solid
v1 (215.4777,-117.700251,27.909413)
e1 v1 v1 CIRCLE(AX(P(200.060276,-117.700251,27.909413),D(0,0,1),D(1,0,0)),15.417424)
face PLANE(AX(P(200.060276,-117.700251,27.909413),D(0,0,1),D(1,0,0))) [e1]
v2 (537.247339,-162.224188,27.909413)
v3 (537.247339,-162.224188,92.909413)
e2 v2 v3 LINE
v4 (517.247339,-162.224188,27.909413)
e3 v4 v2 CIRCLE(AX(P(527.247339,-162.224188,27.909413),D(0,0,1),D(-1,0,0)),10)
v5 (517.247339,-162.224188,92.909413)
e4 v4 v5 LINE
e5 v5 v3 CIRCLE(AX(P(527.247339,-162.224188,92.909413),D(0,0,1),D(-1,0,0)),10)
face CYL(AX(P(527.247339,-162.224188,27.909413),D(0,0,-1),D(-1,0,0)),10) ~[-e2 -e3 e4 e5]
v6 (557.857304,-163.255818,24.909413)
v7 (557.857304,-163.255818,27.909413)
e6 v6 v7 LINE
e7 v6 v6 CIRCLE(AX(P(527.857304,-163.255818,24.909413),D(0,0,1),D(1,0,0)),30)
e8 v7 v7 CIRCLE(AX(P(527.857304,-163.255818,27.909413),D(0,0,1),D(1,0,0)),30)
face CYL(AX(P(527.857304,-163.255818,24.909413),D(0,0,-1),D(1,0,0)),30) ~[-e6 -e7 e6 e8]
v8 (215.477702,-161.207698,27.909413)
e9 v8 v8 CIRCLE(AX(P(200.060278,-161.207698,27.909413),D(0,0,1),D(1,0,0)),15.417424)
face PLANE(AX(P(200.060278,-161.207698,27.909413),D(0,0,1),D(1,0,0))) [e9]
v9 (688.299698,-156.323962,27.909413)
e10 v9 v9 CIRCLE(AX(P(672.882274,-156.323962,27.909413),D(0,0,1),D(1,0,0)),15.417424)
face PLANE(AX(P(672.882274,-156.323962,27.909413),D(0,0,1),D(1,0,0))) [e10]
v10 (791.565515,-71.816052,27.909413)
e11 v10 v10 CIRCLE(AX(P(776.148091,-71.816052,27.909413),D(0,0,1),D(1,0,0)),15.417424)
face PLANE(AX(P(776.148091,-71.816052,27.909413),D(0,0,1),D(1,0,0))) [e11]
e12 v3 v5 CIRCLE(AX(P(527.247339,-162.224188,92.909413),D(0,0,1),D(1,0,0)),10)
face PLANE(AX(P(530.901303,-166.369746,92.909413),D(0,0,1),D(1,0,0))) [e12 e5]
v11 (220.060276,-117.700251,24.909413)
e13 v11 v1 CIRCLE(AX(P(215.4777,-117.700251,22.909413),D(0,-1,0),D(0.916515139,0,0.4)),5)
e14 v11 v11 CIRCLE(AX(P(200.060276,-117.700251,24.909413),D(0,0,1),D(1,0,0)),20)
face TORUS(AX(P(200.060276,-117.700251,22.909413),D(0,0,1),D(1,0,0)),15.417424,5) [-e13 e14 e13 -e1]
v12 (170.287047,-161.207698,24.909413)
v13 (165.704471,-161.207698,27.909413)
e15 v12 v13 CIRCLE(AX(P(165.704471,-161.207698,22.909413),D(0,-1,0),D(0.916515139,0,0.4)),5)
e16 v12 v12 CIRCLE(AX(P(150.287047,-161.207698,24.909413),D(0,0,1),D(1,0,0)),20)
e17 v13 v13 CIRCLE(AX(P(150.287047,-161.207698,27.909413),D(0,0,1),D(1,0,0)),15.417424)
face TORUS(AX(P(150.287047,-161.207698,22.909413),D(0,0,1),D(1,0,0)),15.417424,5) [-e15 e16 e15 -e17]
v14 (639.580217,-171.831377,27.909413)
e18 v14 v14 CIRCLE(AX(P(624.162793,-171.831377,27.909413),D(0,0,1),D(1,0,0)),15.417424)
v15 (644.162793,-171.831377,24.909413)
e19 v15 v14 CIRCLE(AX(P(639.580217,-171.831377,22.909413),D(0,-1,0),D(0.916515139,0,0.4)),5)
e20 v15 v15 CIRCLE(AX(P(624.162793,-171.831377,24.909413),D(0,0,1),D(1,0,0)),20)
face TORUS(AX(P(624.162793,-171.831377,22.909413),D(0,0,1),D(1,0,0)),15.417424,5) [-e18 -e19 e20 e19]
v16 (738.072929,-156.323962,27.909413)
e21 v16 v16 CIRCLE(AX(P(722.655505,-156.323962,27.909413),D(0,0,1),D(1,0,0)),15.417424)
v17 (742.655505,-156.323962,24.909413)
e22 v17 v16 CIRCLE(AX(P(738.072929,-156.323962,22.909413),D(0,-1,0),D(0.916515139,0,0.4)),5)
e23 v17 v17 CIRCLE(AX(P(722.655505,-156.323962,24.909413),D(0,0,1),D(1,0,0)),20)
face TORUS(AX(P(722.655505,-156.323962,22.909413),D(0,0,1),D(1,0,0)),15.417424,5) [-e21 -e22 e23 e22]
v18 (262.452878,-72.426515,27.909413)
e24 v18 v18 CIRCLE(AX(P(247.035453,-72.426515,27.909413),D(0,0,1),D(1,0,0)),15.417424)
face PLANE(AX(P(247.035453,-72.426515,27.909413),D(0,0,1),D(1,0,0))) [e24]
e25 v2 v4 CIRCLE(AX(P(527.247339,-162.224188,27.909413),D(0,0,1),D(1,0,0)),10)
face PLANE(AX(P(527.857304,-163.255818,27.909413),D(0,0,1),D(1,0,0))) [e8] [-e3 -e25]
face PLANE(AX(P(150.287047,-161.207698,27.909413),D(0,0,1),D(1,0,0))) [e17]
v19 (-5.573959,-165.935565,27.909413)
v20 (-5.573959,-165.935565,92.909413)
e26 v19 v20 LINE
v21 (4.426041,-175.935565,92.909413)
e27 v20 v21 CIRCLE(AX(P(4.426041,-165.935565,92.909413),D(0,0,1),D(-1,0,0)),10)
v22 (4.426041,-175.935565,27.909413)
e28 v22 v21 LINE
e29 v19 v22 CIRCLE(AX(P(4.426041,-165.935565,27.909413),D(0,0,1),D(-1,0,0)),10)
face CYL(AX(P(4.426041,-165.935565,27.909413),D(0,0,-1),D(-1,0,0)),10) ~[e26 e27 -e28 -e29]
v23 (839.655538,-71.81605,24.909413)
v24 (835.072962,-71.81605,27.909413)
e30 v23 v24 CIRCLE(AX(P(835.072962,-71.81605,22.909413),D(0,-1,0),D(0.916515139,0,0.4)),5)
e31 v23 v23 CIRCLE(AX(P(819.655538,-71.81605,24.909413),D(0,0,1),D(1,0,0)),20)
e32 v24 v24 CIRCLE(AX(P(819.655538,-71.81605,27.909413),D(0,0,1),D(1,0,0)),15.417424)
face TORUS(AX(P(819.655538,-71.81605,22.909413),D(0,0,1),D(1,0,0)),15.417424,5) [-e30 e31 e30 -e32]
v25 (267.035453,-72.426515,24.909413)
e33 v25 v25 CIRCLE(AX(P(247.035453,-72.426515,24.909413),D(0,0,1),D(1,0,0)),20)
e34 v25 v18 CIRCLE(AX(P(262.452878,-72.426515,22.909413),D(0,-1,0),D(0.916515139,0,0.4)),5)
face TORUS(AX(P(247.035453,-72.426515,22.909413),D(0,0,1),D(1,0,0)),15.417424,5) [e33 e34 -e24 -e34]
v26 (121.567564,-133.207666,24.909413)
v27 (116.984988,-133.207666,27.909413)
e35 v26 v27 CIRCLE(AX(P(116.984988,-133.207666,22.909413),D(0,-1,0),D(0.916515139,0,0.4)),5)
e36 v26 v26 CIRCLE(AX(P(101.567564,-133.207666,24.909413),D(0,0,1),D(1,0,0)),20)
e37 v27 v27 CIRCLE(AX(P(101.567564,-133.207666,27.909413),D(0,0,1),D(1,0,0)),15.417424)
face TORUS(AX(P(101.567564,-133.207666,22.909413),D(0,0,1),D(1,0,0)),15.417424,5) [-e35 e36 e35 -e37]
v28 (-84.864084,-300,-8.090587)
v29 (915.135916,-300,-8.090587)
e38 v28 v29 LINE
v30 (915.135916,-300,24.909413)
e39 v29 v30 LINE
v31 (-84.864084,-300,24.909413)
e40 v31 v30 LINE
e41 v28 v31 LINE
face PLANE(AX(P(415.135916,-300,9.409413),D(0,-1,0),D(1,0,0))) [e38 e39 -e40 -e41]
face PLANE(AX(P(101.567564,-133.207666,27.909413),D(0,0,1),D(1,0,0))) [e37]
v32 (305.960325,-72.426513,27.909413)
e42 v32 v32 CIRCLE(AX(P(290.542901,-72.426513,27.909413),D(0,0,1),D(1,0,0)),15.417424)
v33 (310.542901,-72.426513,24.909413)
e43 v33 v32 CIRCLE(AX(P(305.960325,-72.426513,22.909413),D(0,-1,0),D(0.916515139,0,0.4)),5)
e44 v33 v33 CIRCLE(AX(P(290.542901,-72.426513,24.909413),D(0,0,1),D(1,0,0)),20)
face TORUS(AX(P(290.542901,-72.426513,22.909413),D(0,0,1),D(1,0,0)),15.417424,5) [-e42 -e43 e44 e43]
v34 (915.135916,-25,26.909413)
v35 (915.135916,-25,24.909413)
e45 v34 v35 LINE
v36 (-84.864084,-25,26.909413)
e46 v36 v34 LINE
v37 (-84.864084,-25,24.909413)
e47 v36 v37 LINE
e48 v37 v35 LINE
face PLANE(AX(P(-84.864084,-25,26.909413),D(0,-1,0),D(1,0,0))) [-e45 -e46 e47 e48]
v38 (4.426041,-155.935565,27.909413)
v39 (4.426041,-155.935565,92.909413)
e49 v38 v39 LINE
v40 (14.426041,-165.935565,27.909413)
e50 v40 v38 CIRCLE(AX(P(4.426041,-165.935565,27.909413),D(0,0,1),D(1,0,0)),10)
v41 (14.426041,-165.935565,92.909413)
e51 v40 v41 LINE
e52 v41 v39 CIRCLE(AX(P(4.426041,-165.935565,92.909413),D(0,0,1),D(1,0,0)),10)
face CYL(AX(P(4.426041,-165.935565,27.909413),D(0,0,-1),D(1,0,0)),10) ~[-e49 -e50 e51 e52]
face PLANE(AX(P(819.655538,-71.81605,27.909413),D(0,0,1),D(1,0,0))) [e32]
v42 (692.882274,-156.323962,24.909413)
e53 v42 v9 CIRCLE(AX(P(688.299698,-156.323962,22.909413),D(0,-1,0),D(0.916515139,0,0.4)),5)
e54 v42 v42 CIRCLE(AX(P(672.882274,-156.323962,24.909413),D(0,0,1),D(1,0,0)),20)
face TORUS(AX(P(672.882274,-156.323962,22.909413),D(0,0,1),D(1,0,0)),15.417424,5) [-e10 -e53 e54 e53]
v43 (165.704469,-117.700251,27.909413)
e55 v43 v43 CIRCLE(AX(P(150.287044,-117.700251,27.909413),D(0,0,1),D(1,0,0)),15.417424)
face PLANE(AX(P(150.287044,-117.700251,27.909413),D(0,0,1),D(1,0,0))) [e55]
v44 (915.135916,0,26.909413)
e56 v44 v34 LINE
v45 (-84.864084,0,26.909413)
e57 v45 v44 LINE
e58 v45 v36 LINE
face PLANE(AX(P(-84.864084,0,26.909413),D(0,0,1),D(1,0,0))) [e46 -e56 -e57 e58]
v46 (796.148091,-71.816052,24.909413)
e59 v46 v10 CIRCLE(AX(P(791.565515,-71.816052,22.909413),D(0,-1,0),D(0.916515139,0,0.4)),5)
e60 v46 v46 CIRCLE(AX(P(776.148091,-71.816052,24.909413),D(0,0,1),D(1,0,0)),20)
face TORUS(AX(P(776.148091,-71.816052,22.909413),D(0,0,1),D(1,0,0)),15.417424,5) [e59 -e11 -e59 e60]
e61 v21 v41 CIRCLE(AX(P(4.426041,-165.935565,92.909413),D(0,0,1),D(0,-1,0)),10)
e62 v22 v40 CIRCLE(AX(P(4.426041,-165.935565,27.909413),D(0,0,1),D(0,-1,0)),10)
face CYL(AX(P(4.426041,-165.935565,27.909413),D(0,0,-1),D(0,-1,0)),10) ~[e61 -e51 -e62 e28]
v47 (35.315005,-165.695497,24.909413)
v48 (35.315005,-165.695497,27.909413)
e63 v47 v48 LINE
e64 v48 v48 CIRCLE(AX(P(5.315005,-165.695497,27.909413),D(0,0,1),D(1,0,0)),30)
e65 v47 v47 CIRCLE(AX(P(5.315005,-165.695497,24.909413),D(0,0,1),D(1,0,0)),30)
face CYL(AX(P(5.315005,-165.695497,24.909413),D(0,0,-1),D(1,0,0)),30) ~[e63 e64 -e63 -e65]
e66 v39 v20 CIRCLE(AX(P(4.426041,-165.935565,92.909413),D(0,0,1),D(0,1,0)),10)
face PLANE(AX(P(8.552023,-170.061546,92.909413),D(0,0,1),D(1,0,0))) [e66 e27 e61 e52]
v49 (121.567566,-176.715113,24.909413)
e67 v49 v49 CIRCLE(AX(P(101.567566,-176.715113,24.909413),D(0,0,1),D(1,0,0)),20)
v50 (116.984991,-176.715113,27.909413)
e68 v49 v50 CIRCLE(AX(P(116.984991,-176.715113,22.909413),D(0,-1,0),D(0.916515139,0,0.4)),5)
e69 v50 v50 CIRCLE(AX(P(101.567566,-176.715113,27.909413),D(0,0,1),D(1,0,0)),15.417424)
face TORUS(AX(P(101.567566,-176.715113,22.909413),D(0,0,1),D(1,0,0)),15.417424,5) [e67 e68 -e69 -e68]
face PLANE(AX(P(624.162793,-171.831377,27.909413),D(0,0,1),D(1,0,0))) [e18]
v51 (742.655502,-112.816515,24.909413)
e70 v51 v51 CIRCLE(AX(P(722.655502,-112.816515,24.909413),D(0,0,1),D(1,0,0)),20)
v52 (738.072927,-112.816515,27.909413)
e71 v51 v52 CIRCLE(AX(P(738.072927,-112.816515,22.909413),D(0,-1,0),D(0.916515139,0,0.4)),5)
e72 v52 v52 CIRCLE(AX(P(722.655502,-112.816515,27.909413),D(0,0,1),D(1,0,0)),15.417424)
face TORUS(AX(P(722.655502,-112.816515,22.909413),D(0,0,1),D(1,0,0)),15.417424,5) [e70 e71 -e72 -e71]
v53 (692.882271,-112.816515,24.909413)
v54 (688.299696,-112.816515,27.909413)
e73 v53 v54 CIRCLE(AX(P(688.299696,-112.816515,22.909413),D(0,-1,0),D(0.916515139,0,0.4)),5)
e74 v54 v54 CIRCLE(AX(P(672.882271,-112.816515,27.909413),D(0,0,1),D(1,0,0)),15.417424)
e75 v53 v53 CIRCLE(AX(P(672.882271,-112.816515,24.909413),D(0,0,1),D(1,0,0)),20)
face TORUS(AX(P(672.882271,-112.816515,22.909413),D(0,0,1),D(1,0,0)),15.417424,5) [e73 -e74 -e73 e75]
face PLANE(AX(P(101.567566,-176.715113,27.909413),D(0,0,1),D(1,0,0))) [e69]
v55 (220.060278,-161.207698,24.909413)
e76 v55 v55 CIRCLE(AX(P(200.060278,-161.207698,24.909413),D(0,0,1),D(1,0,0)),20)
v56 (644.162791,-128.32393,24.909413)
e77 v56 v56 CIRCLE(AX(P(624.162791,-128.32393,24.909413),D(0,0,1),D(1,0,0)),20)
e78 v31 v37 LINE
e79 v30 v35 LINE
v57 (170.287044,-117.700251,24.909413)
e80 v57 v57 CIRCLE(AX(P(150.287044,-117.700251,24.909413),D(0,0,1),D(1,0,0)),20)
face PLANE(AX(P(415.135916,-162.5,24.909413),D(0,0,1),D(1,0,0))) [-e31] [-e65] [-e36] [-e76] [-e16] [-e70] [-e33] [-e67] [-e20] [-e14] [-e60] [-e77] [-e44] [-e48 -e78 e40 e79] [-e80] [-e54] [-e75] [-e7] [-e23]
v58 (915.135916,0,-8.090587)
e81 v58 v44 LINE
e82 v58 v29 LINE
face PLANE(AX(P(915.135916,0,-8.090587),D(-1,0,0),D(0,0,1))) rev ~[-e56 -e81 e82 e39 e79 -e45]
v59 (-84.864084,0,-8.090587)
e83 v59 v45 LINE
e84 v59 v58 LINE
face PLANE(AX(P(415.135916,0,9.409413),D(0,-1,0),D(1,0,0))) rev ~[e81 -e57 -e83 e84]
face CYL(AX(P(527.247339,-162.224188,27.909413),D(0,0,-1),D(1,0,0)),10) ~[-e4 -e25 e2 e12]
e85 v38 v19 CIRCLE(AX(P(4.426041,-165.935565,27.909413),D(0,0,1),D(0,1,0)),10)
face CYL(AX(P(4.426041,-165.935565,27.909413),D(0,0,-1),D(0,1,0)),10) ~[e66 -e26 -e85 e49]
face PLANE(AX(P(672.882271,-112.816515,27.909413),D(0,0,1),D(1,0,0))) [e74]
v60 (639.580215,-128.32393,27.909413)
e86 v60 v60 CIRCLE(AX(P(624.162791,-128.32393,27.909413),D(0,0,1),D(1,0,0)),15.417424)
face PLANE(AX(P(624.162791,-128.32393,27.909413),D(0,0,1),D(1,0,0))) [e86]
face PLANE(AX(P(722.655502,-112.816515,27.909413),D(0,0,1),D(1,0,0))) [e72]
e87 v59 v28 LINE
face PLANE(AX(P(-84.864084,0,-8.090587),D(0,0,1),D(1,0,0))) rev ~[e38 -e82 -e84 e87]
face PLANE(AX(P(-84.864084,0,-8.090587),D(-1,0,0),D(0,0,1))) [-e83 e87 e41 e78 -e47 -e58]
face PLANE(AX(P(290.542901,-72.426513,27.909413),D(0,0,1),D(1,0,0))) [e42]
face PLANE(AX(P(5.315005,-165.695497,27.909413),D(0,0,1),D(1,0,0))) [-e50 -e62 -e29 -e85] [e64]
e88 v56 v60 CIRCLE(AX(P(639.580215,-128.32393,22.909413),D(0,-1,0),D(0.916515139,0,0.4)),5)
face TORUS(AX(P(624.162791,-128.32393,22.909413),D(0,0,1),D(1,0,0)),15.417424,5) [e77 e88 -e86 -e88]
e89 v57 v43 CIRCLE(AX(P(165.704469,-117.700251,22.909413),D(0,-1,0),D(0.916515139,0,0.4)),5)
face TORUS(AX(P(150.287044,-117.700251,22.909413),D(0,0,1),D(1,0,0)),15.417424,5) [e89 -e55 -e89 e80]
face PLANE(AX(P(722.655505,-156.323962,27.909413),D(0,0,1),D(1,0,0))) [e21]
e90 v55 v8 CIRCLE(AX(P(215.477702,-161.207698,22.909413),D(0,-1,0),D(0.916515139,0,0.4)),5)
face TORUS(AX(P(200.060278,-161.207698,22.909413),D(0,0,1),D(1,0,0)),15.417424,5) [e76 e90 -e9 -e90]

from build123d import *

# Parameters (mm, degrees)
F0_W     = 1000
F0_H     = 35
F1_DEPTH = 300
F2_W     = 1000
F2_H     = 275
F3_DEPTH = 2
F4_R     = 30
F4_R_2   = 20
F5_DEPTH = 3
F8_DEPTH = 65


# Not quite as in the source:
# - a fillet or chamfer that OpenCascade refuses, or shapes differently, is made with other operations: its cross-section is extruded or revolved along the edge and cut away or added


with BuildPart() as f1:
    # F0 (on Front) → F1 (new body)
    with BuildSketch(Plane.XZ):
        with Locations((415.1359161552, 9.4094127417)):
            Rectangle(F0_W, F0_H)
    extrude(amount=F1_DEPTH)

    # F2 (on face) → F3 (cut)
    with BuildSketch(Plane.XY.offset(26.9094127417)):
        with Locations((415.1359161552, -162.5)):
            Rectangle(F2_W, F2_H)
    extrude(amount=-F3_DEPTH, mode=Mode.SUBTRACT)

    # F4 (on face) → F5 (join)
    with BuildSketch(Plane.XY.offset(24.9094127417)):
        with Locations((5.3150048805, -165.6954972839)):
            Circle(F4_R)
        with Locations((101.5675663948, -176.7151132226)):
            Circle(F4_R_2)
        with Locations((101.5675638381, -133.2076661438)):
            Circle(F4_R_2)
        with Locations((150.2870444718, -117.7002512067)):
            Circle(F4_R_2)
        with Locations((200.0602781773, -161.2076982856)):
            Circle(F4_R_2)
        with Locations((200.0602756206, -117.7002512067)):
            Circle(F4_R_2)
        with Locations((150.2870470285, -161.2076982856)):
            Circle(F4_R_2)
        with Locations((247.0354534834, -72.4265153941)):
            Circle(F4_R_2)
        with Locations((290.5429005623, -72.4265128374)):
            Circle(F4_R_2)
        with Locations((527.8573036194, -163.2558181882)):
            Circle(F4_R)
        with Locations((624.1627931595, -171.8313768506)):
            Circle(F4_R_2)
        with Locations((624.1627906028, -128.3239297718)):
            Circle(F4_R_2)
        with Locations((672.8822712365, -112.8165148347)):
            Circle(F4_R_2)
        with Locations((672.8822737932, -156.3239619136)):
            Circle(F4_R_2)
        with Locations((722.6555049419, -156.3239619136)):
            Circle(F4_R_2)
        with Locations((722.6555023852, -112.8165148347)):
            Circle(F4_R_2)
        with Locations((776.1480905264, -71.8160520729)):
            Circle(F4_R_2)
        with Locations((819.6555376053, -71.8160495162)):
            Circle(F4_R_2)
    extrude(amount=F5_DEPTH)

    # F6: fillet of radius 5 on 16 edges, made by hand

    # F6_s1 → F6_t2 (revolve, cut)
    with BuildSketch(Plane.XZ.offset(176.7151132226)):
        with BuildLine():
            ThreePointArc((121.5675663948, 24.9094127417), (119.7236034874, 27.0927128743), (116.9849906999, 27.9094127417))
            Line((116.9849906999, 27.9094127417), (121.5675663948, 27.9094127417))
            Line((121.5675663948, 27.9094127417), (121.5675663948, 24.9094127417))
        make_face()
    revolve(axis=Axis((101.5675663948, -176.7151132226, 27.9094127417), (0, 0, 1)), mode=Mode.SUBTRACT)

    # F6_s3 → F6_t4 (revolve, cut)
    with BuildSketch(Plane.XZ.offset(133.2076661438)):
        with BuildLine():
            ThreePointArc((121.5675638381, 24.9094127417), (119.7236009307, 27.0927128743), (116.9849881431, 27.9094127417))
            Line((116.9849881431, 27.9094127417), (121.5675638381, 27.9094127417))
            Line((121.5675638381, 27.9094127417), (121.5675638381, 24.9094127417))
        make_face()
    revolve(axis=Axis((101.5675638381, -133.2076661438, 27.9094127417), (0, 0, 1)), mode=Mode.SUBTRACT)

    # F6_s5 → F6_t6 (revolve, cut)
    with BuildSketch(Plane.XZ.offset(117.7002512067)):
        with BuildLine():
            ThreePointArc((170.2870444718, 24.9094127417), (168.4430815644, 27.0927128743), (165.7044687769, 27.9094127417))
            Line((165.7044687769, 27.9094127417), (170.2870444718, 27.9094127417))
            Line((170.2870444718, 27.9094127417), (170.2870444718, 24.9094127417))
        make_face()
    revolve(axis=Axis((150.2870444718, -117.7002512067, 27.9094127417), (0, 0, 1)), mode=Mode.SUBTRACT)

    # F6_s7 → F6_t8 (revolve, cut)
    with BuildSketch(Plane.XZ.offset(161.2076982856)):
        with BuildLine():
            ThreePointArc((170.2870470285, 24.9094127417), (168.4430841211, 27.0927128743), (165.7044713336, 27.9094127417))
            Line((165.7044713336, 27.9094127417), (170.2870470285, 27.9094127417))
            Line((170.2870470285, 27.9094127417), (170.2870470285, 24.9094127417))
        make_face()
    revolve(axis=Axis((150.2870470285, -161.2076982856, 27.9094127417), (0, 0, 1)), mode=Mode.SUBTRACT)

    # F6_s9 → F6_t10 (revolve, cut)
    with BuildSketch(Plane.XZ.offset(161.2076982856)):
        with BuildLine():
            ThreePointArc((220.0602781773, 24.9094127417), (218.2163152698, 27.0927128743), (215.4777024823, 27.9094127417))
            Line((215.4777024823, 27.9094127417), (220.0602781773, 27.9094127417))
            Line((220.0602781773, 27.9094127417), (220.0602781773, 24.9094127417))
        make_face()
    revolve(axis=Axis((200.0602781773, -161.2076982856, 27.9094127417), (0, 0, 1)), mode=Mode.SUBTRACT)

    # F6_s11 → F6_t12 (revolve, cut)
    with BuildSketch(Plane.XZ.offset(117.7002512067)):
        with BuildLine():
            ThreePointArc((220.0602756206, 24.9094127417), (218.2163127131, 27.0927128743), (215.4776999256, 27.9094127417))
            Line((215.4776999256, 27.9094127417), (220.0602756206, 27.9094127417))
            Line((220.0602756206, 27.9094127417), (220.0602756206, 24.9094127417))
        make_face()
    revolve(axis=Axis((200.0602756206, -117.7002512067, 27.9094127417), (0, 0, 1)), mode=Mode.SUBTRACT)

    # F6_s13 → F6_t14 (revolve, cut)
    with BuildSketch(Plane.XZ.offset(72.4265153941)):
        with BuildLine():
            ThreePointArc((267.0354534834, 24.9094127417), (265.191490576, 27.0927128743), (262.4528777885, 27.9094127417))
            Line((262.4528777885, 27.9094127417), (267.0354534834, 27.9094127417))
            Line((267.0354534834, 27.9094127417), (267.0354534834, 24.9094127417))
        make_face()
    revolve(axis=Axis((247.0354534834, -72.4265153941, 27.9094127417), (0, 0, 1)), mode=Mode.SUBTRACT)

    # F6_s15 → F6_t16 (revolve, cut)
    with BuildSketch(Plane.XZ.offset(72.4265128374)):
        with BuildLine():
            ThreePointArc((310.5429005623, 24.9094127417), (308.6989376549, 27.0927128743), (305.9603248673, 27.9094127417))
            Line((305.9603248673, 27.9094127417), (310.5429005623, 27.9094127417))
            Line((310.5429005623, 27.9094127417), (310.5429005623, 24.9094127417))
        make_face()
    revolve(axis=Axis((290.5429005623, -72.4265128374, 27.9094127417), (0, 0, 1)), mode=Mode.SUBTRACT)

    # F6_s17 → F6_t18 (revolve, cut)
    with BuildSketch(Plane.XZ.offset(71.8160495162)):
        with BuildLine():
            ThreePointArc((839.6555376053, 24.9094127417), (837.8115746979, 27.0927128743), (835.0729619103, 27.9094127417))
            Line((835.0729619103, 27.9094127417), (839.6555376053, 27.9094127417))
            Line((839.6555376053, 27.9094127417), (839.6555376053, 24.9094127417))
        make_face()
    revolve(axis=Axis((819.6555376053, -71.8160495162, 27.9094127417), (0, 0, 1)), mode=Mode.SUBTRACT)

    # F6_s19 → F6_t20 (revolve, cut)
    with BuildSketch(Plane.XZ.offset(71.8160520729)):
        with BuildLine():
            ThreePointArc((796.1480905264, 24.9094127417), (794.304127619, 27.0927128743), (791.5655148315, 27.9094127417))
            Line((791.5655148315, 27.9094127417), (796.1480905264, 27.9094127417))
            Line((796.1480905264, 27.9094127417), (796.1480905264, 24.9094127417))
        make_face()
    revolve(axis=Axis((776.1480905264, -71.8160520729, 27.9094127417), (0, 0, 1)), mode=Mode.SUBTRACT)

    # F6_s21 → F6_t22 (revolve, cut)
    with BuildSketch(Plane.XZ.offset(112.8165148347)):
        with BuildLine():
            ThreePointArc((742.6555023852, 24.9094127417), (740.8115394778, 27.0927128743), (738.0729266903, 27.9094127417))
            Line((738.0729266903, 27.9094127417), (742.6555023852, 27.9094127417))
            Line((742.6555023852, 27.9094127417), (742.6555023852, 24.9094127417))
        make_face()
    revolve(axis=Axis((722.6555023852, -112.8165148347, 27.9094127417), (0, 0, 1)), mode=Mode.SUBTRACT)

    # F6_s23 → F6_t24 (revolve, cut)
    with BuildSketch(Plane.XZ.offset(156.3239619136)):
        with BuildLine():
            ThreePointArc((742.6555049419, 24.9094127417), (740.8115420345, 27.0927128743), (738.072929247, 27.9094127417))
            Line((738.072929247, 27.9094127417), (742.6555049419, 27.9094127417))
            Line((742.6555049419, 27.9094127417), (742.6555049419, 24.9094127417))
        make_face()
    revolve(axis=Axis((722.6555049419, -156.3239619136, 27.9094127417), (0, 0, 1)), mode=Mode.SUBTRACT)

    # F6_s25 → F6_t26 (revolve, cut)
    with BuildSketch(Plane.XZ.offset(156.3239619136)):
        with BuildLine():
            ThreePointArc((692.8822737932, 24.9094127417), (691.0383108858, 27.0927128743), (688.2996980983, 27.9094127417))
            Line((688.2996980983, 27.9094127417), (692.8822737932, 27.9094127417))
            Line((692.8822737932, 27.9094127417), (692.8822737932, 24.9094127417))
        make_face()
    revolve(axis=Axis((672.8822737932, -156.3239619136, 27.9094127417), (0, 0, 1)), mode=Mode.SUBTRACT)

    # F6_s27 → F6_t28 (revolve, cut)
    with BuildSketch(Plane.XZ.offset(112.8165148347)):
        with BuildLine():
            ThreePointArc((692.8822712365, 24.9094127417), (691.0383083291, 27.0927128743), (688.2996955416, 27.9094127417))
            Line((688.2996955416, 27.9094127417), (692.8822712365, 27.9094127417))
            Line((692.8822712365, 27.9094127417), (692.8822712365, 24.9094127417))
        make_face()
    revolve(axis=Axis((672.8822712365, -112.8165148347, 27.9094127417), (0, 0, 1)), mode=Mode.SUBTRACT)

    # F6_s29 → F6_t30 (revolve, cut)
    with BuildSketch(Plane.XZ.offset(128.3239297718)):
        with BuildLine():
            ThreePointArc((644.1627906028, 24.9094127417), (642.3188276953, 27.0927128743), (639.5802149078, 27.9094127417))
            Line((639.5802149078, 27.9094127417), (644.1627906028, 27.9094127417))
            Line((644.1627906028, 27.9094127417), (644.1627906028, 24.9094127417))
        make_face()
    revolve(axis=Axis((624.1627906028, -128.3239297718, 27.9094127417), (0, 0, 1)), mode=Mode.SUBTRACT)

    # F6_s31 → F6_t32 (revolve, cut)
    with BuildSketch(Plane.XZ.offset(171.8313768506)):
        with BuildLine():
            ThreePointArc((644.1627931595, 24.9094127417), (642.3188302521, 27.0927128743), (639.5802174645, 27.9094127417))
            Line((639.5802174645, 27.9094127417), (644.1627931595, 27.9094127417))
            Line((644.1627931595, 27.9094127417), (644.1627931595, 24.9094127417))
        make_face()
    revolve(axis=Axis((624.1627931595, -171.8313768506, 27.9094127417), (0, 0, 1)), mode=Mode.SUBTRACT)

    # F7 (on face) → F8 (join)
    with BuildSketch(Plane.XY.offset(27.9094127417)):
        with BuildLine():
            ThreePointArc((4.4260412971, -175.935565011), (11.497109109, -173.0066328229), (14.4260412971, -165.935565011))
            Line((14.4260412971, -165.935565011), (4.4260412971, -165.935565011))
            Line((4.4260412971, -165.935565011), (4.4260412971, -175.935565011))
        make_face()
        with BuildLine():
            Line((4.4260412971, -175.935565011), (4.4260412971, -165.935565011))
            Line((4.4260412971, -165.935565011), (-5.5739587029, -165.935565011))
            ThreePointArc((-5.5739587029, -165.935565011), (-2.6450265147, -173.0066328229), (4.4260412971, -175.935565011))
        make_face()
        with BuildLine():
            Line((-5.5739587029, -165.935565011), (4.4260412971, -165.935565011))
            Line((4.4260412971, -165.935565011), (4.4260412971, -155.935565011))
            ThreePointArc((4.4260412971, -155.935565011), (-2.6450265147, -158.8644971991), (-5.5739587029, -165.935565011))
        make_face()
        with BuildLine():
            Line((4.4260412971, -165.935565011), (14.4260412971, -165.935565011))
            ThreePointArc((14.4260412971, -165.935565011), (11.497109109, -158.8644971991), (4.4260412971, -155.935565011))
            Line((4.4260412971, -155.935565011), (4.4260412971, -165.935565011))
        make_face()
        with BuildLine():
            Line((537.2473394871, -162.224188447), (526.3316631317, -162.224188447))
            Line((526.3316631317, -162.224188447), (526.3316631317, -172.1821770397))
            ThreePointArc((526.3316631317, -172.1821770397), (533.9868957205, -169.6119067535), (537.2473394871, -162.224188447))
        make_face()
        with BuildLine():
            Line((526.3316631317, -172.1821770397), (526.3316631317, -162.224188447))
            Line((526.3316631317, -162.224188447), (517.2473394871, -162.224188447))
            ThreePointArc((517.2473394871, -162.224188447), (519.8596211805, -168.9637446804), (526.3316631317, -172.1821770397))
        make_face()
        with BuildLine():
            Line((526.3316631317, -162.224188447), (526.3316631317, -152.2661998543))
            ThreePointArc((526.3316631317, -152.2661998543), (519.8596211805, -155.4846322136), (517.2473394871, -162.224188447))
            Line((517.2473394871, -162.224188447), (526.3316631317, -162.224188447))
        make_face()
        with BuildLine():
            ThreePointArc((537.2473394871, -162.224188447), (533.9868957205, -154.8364701405), (526.3316631317, -152.2661998543))
            Line((526.3316631317, -152.2661998543), (526.3316631317, -162.224188447))
            Line((526.3316631317, -162.224188447), (537.2473394871, -162.224188447))
        make_face()
    extrude(amount=F8_DEPTH)


solid = f1.part
